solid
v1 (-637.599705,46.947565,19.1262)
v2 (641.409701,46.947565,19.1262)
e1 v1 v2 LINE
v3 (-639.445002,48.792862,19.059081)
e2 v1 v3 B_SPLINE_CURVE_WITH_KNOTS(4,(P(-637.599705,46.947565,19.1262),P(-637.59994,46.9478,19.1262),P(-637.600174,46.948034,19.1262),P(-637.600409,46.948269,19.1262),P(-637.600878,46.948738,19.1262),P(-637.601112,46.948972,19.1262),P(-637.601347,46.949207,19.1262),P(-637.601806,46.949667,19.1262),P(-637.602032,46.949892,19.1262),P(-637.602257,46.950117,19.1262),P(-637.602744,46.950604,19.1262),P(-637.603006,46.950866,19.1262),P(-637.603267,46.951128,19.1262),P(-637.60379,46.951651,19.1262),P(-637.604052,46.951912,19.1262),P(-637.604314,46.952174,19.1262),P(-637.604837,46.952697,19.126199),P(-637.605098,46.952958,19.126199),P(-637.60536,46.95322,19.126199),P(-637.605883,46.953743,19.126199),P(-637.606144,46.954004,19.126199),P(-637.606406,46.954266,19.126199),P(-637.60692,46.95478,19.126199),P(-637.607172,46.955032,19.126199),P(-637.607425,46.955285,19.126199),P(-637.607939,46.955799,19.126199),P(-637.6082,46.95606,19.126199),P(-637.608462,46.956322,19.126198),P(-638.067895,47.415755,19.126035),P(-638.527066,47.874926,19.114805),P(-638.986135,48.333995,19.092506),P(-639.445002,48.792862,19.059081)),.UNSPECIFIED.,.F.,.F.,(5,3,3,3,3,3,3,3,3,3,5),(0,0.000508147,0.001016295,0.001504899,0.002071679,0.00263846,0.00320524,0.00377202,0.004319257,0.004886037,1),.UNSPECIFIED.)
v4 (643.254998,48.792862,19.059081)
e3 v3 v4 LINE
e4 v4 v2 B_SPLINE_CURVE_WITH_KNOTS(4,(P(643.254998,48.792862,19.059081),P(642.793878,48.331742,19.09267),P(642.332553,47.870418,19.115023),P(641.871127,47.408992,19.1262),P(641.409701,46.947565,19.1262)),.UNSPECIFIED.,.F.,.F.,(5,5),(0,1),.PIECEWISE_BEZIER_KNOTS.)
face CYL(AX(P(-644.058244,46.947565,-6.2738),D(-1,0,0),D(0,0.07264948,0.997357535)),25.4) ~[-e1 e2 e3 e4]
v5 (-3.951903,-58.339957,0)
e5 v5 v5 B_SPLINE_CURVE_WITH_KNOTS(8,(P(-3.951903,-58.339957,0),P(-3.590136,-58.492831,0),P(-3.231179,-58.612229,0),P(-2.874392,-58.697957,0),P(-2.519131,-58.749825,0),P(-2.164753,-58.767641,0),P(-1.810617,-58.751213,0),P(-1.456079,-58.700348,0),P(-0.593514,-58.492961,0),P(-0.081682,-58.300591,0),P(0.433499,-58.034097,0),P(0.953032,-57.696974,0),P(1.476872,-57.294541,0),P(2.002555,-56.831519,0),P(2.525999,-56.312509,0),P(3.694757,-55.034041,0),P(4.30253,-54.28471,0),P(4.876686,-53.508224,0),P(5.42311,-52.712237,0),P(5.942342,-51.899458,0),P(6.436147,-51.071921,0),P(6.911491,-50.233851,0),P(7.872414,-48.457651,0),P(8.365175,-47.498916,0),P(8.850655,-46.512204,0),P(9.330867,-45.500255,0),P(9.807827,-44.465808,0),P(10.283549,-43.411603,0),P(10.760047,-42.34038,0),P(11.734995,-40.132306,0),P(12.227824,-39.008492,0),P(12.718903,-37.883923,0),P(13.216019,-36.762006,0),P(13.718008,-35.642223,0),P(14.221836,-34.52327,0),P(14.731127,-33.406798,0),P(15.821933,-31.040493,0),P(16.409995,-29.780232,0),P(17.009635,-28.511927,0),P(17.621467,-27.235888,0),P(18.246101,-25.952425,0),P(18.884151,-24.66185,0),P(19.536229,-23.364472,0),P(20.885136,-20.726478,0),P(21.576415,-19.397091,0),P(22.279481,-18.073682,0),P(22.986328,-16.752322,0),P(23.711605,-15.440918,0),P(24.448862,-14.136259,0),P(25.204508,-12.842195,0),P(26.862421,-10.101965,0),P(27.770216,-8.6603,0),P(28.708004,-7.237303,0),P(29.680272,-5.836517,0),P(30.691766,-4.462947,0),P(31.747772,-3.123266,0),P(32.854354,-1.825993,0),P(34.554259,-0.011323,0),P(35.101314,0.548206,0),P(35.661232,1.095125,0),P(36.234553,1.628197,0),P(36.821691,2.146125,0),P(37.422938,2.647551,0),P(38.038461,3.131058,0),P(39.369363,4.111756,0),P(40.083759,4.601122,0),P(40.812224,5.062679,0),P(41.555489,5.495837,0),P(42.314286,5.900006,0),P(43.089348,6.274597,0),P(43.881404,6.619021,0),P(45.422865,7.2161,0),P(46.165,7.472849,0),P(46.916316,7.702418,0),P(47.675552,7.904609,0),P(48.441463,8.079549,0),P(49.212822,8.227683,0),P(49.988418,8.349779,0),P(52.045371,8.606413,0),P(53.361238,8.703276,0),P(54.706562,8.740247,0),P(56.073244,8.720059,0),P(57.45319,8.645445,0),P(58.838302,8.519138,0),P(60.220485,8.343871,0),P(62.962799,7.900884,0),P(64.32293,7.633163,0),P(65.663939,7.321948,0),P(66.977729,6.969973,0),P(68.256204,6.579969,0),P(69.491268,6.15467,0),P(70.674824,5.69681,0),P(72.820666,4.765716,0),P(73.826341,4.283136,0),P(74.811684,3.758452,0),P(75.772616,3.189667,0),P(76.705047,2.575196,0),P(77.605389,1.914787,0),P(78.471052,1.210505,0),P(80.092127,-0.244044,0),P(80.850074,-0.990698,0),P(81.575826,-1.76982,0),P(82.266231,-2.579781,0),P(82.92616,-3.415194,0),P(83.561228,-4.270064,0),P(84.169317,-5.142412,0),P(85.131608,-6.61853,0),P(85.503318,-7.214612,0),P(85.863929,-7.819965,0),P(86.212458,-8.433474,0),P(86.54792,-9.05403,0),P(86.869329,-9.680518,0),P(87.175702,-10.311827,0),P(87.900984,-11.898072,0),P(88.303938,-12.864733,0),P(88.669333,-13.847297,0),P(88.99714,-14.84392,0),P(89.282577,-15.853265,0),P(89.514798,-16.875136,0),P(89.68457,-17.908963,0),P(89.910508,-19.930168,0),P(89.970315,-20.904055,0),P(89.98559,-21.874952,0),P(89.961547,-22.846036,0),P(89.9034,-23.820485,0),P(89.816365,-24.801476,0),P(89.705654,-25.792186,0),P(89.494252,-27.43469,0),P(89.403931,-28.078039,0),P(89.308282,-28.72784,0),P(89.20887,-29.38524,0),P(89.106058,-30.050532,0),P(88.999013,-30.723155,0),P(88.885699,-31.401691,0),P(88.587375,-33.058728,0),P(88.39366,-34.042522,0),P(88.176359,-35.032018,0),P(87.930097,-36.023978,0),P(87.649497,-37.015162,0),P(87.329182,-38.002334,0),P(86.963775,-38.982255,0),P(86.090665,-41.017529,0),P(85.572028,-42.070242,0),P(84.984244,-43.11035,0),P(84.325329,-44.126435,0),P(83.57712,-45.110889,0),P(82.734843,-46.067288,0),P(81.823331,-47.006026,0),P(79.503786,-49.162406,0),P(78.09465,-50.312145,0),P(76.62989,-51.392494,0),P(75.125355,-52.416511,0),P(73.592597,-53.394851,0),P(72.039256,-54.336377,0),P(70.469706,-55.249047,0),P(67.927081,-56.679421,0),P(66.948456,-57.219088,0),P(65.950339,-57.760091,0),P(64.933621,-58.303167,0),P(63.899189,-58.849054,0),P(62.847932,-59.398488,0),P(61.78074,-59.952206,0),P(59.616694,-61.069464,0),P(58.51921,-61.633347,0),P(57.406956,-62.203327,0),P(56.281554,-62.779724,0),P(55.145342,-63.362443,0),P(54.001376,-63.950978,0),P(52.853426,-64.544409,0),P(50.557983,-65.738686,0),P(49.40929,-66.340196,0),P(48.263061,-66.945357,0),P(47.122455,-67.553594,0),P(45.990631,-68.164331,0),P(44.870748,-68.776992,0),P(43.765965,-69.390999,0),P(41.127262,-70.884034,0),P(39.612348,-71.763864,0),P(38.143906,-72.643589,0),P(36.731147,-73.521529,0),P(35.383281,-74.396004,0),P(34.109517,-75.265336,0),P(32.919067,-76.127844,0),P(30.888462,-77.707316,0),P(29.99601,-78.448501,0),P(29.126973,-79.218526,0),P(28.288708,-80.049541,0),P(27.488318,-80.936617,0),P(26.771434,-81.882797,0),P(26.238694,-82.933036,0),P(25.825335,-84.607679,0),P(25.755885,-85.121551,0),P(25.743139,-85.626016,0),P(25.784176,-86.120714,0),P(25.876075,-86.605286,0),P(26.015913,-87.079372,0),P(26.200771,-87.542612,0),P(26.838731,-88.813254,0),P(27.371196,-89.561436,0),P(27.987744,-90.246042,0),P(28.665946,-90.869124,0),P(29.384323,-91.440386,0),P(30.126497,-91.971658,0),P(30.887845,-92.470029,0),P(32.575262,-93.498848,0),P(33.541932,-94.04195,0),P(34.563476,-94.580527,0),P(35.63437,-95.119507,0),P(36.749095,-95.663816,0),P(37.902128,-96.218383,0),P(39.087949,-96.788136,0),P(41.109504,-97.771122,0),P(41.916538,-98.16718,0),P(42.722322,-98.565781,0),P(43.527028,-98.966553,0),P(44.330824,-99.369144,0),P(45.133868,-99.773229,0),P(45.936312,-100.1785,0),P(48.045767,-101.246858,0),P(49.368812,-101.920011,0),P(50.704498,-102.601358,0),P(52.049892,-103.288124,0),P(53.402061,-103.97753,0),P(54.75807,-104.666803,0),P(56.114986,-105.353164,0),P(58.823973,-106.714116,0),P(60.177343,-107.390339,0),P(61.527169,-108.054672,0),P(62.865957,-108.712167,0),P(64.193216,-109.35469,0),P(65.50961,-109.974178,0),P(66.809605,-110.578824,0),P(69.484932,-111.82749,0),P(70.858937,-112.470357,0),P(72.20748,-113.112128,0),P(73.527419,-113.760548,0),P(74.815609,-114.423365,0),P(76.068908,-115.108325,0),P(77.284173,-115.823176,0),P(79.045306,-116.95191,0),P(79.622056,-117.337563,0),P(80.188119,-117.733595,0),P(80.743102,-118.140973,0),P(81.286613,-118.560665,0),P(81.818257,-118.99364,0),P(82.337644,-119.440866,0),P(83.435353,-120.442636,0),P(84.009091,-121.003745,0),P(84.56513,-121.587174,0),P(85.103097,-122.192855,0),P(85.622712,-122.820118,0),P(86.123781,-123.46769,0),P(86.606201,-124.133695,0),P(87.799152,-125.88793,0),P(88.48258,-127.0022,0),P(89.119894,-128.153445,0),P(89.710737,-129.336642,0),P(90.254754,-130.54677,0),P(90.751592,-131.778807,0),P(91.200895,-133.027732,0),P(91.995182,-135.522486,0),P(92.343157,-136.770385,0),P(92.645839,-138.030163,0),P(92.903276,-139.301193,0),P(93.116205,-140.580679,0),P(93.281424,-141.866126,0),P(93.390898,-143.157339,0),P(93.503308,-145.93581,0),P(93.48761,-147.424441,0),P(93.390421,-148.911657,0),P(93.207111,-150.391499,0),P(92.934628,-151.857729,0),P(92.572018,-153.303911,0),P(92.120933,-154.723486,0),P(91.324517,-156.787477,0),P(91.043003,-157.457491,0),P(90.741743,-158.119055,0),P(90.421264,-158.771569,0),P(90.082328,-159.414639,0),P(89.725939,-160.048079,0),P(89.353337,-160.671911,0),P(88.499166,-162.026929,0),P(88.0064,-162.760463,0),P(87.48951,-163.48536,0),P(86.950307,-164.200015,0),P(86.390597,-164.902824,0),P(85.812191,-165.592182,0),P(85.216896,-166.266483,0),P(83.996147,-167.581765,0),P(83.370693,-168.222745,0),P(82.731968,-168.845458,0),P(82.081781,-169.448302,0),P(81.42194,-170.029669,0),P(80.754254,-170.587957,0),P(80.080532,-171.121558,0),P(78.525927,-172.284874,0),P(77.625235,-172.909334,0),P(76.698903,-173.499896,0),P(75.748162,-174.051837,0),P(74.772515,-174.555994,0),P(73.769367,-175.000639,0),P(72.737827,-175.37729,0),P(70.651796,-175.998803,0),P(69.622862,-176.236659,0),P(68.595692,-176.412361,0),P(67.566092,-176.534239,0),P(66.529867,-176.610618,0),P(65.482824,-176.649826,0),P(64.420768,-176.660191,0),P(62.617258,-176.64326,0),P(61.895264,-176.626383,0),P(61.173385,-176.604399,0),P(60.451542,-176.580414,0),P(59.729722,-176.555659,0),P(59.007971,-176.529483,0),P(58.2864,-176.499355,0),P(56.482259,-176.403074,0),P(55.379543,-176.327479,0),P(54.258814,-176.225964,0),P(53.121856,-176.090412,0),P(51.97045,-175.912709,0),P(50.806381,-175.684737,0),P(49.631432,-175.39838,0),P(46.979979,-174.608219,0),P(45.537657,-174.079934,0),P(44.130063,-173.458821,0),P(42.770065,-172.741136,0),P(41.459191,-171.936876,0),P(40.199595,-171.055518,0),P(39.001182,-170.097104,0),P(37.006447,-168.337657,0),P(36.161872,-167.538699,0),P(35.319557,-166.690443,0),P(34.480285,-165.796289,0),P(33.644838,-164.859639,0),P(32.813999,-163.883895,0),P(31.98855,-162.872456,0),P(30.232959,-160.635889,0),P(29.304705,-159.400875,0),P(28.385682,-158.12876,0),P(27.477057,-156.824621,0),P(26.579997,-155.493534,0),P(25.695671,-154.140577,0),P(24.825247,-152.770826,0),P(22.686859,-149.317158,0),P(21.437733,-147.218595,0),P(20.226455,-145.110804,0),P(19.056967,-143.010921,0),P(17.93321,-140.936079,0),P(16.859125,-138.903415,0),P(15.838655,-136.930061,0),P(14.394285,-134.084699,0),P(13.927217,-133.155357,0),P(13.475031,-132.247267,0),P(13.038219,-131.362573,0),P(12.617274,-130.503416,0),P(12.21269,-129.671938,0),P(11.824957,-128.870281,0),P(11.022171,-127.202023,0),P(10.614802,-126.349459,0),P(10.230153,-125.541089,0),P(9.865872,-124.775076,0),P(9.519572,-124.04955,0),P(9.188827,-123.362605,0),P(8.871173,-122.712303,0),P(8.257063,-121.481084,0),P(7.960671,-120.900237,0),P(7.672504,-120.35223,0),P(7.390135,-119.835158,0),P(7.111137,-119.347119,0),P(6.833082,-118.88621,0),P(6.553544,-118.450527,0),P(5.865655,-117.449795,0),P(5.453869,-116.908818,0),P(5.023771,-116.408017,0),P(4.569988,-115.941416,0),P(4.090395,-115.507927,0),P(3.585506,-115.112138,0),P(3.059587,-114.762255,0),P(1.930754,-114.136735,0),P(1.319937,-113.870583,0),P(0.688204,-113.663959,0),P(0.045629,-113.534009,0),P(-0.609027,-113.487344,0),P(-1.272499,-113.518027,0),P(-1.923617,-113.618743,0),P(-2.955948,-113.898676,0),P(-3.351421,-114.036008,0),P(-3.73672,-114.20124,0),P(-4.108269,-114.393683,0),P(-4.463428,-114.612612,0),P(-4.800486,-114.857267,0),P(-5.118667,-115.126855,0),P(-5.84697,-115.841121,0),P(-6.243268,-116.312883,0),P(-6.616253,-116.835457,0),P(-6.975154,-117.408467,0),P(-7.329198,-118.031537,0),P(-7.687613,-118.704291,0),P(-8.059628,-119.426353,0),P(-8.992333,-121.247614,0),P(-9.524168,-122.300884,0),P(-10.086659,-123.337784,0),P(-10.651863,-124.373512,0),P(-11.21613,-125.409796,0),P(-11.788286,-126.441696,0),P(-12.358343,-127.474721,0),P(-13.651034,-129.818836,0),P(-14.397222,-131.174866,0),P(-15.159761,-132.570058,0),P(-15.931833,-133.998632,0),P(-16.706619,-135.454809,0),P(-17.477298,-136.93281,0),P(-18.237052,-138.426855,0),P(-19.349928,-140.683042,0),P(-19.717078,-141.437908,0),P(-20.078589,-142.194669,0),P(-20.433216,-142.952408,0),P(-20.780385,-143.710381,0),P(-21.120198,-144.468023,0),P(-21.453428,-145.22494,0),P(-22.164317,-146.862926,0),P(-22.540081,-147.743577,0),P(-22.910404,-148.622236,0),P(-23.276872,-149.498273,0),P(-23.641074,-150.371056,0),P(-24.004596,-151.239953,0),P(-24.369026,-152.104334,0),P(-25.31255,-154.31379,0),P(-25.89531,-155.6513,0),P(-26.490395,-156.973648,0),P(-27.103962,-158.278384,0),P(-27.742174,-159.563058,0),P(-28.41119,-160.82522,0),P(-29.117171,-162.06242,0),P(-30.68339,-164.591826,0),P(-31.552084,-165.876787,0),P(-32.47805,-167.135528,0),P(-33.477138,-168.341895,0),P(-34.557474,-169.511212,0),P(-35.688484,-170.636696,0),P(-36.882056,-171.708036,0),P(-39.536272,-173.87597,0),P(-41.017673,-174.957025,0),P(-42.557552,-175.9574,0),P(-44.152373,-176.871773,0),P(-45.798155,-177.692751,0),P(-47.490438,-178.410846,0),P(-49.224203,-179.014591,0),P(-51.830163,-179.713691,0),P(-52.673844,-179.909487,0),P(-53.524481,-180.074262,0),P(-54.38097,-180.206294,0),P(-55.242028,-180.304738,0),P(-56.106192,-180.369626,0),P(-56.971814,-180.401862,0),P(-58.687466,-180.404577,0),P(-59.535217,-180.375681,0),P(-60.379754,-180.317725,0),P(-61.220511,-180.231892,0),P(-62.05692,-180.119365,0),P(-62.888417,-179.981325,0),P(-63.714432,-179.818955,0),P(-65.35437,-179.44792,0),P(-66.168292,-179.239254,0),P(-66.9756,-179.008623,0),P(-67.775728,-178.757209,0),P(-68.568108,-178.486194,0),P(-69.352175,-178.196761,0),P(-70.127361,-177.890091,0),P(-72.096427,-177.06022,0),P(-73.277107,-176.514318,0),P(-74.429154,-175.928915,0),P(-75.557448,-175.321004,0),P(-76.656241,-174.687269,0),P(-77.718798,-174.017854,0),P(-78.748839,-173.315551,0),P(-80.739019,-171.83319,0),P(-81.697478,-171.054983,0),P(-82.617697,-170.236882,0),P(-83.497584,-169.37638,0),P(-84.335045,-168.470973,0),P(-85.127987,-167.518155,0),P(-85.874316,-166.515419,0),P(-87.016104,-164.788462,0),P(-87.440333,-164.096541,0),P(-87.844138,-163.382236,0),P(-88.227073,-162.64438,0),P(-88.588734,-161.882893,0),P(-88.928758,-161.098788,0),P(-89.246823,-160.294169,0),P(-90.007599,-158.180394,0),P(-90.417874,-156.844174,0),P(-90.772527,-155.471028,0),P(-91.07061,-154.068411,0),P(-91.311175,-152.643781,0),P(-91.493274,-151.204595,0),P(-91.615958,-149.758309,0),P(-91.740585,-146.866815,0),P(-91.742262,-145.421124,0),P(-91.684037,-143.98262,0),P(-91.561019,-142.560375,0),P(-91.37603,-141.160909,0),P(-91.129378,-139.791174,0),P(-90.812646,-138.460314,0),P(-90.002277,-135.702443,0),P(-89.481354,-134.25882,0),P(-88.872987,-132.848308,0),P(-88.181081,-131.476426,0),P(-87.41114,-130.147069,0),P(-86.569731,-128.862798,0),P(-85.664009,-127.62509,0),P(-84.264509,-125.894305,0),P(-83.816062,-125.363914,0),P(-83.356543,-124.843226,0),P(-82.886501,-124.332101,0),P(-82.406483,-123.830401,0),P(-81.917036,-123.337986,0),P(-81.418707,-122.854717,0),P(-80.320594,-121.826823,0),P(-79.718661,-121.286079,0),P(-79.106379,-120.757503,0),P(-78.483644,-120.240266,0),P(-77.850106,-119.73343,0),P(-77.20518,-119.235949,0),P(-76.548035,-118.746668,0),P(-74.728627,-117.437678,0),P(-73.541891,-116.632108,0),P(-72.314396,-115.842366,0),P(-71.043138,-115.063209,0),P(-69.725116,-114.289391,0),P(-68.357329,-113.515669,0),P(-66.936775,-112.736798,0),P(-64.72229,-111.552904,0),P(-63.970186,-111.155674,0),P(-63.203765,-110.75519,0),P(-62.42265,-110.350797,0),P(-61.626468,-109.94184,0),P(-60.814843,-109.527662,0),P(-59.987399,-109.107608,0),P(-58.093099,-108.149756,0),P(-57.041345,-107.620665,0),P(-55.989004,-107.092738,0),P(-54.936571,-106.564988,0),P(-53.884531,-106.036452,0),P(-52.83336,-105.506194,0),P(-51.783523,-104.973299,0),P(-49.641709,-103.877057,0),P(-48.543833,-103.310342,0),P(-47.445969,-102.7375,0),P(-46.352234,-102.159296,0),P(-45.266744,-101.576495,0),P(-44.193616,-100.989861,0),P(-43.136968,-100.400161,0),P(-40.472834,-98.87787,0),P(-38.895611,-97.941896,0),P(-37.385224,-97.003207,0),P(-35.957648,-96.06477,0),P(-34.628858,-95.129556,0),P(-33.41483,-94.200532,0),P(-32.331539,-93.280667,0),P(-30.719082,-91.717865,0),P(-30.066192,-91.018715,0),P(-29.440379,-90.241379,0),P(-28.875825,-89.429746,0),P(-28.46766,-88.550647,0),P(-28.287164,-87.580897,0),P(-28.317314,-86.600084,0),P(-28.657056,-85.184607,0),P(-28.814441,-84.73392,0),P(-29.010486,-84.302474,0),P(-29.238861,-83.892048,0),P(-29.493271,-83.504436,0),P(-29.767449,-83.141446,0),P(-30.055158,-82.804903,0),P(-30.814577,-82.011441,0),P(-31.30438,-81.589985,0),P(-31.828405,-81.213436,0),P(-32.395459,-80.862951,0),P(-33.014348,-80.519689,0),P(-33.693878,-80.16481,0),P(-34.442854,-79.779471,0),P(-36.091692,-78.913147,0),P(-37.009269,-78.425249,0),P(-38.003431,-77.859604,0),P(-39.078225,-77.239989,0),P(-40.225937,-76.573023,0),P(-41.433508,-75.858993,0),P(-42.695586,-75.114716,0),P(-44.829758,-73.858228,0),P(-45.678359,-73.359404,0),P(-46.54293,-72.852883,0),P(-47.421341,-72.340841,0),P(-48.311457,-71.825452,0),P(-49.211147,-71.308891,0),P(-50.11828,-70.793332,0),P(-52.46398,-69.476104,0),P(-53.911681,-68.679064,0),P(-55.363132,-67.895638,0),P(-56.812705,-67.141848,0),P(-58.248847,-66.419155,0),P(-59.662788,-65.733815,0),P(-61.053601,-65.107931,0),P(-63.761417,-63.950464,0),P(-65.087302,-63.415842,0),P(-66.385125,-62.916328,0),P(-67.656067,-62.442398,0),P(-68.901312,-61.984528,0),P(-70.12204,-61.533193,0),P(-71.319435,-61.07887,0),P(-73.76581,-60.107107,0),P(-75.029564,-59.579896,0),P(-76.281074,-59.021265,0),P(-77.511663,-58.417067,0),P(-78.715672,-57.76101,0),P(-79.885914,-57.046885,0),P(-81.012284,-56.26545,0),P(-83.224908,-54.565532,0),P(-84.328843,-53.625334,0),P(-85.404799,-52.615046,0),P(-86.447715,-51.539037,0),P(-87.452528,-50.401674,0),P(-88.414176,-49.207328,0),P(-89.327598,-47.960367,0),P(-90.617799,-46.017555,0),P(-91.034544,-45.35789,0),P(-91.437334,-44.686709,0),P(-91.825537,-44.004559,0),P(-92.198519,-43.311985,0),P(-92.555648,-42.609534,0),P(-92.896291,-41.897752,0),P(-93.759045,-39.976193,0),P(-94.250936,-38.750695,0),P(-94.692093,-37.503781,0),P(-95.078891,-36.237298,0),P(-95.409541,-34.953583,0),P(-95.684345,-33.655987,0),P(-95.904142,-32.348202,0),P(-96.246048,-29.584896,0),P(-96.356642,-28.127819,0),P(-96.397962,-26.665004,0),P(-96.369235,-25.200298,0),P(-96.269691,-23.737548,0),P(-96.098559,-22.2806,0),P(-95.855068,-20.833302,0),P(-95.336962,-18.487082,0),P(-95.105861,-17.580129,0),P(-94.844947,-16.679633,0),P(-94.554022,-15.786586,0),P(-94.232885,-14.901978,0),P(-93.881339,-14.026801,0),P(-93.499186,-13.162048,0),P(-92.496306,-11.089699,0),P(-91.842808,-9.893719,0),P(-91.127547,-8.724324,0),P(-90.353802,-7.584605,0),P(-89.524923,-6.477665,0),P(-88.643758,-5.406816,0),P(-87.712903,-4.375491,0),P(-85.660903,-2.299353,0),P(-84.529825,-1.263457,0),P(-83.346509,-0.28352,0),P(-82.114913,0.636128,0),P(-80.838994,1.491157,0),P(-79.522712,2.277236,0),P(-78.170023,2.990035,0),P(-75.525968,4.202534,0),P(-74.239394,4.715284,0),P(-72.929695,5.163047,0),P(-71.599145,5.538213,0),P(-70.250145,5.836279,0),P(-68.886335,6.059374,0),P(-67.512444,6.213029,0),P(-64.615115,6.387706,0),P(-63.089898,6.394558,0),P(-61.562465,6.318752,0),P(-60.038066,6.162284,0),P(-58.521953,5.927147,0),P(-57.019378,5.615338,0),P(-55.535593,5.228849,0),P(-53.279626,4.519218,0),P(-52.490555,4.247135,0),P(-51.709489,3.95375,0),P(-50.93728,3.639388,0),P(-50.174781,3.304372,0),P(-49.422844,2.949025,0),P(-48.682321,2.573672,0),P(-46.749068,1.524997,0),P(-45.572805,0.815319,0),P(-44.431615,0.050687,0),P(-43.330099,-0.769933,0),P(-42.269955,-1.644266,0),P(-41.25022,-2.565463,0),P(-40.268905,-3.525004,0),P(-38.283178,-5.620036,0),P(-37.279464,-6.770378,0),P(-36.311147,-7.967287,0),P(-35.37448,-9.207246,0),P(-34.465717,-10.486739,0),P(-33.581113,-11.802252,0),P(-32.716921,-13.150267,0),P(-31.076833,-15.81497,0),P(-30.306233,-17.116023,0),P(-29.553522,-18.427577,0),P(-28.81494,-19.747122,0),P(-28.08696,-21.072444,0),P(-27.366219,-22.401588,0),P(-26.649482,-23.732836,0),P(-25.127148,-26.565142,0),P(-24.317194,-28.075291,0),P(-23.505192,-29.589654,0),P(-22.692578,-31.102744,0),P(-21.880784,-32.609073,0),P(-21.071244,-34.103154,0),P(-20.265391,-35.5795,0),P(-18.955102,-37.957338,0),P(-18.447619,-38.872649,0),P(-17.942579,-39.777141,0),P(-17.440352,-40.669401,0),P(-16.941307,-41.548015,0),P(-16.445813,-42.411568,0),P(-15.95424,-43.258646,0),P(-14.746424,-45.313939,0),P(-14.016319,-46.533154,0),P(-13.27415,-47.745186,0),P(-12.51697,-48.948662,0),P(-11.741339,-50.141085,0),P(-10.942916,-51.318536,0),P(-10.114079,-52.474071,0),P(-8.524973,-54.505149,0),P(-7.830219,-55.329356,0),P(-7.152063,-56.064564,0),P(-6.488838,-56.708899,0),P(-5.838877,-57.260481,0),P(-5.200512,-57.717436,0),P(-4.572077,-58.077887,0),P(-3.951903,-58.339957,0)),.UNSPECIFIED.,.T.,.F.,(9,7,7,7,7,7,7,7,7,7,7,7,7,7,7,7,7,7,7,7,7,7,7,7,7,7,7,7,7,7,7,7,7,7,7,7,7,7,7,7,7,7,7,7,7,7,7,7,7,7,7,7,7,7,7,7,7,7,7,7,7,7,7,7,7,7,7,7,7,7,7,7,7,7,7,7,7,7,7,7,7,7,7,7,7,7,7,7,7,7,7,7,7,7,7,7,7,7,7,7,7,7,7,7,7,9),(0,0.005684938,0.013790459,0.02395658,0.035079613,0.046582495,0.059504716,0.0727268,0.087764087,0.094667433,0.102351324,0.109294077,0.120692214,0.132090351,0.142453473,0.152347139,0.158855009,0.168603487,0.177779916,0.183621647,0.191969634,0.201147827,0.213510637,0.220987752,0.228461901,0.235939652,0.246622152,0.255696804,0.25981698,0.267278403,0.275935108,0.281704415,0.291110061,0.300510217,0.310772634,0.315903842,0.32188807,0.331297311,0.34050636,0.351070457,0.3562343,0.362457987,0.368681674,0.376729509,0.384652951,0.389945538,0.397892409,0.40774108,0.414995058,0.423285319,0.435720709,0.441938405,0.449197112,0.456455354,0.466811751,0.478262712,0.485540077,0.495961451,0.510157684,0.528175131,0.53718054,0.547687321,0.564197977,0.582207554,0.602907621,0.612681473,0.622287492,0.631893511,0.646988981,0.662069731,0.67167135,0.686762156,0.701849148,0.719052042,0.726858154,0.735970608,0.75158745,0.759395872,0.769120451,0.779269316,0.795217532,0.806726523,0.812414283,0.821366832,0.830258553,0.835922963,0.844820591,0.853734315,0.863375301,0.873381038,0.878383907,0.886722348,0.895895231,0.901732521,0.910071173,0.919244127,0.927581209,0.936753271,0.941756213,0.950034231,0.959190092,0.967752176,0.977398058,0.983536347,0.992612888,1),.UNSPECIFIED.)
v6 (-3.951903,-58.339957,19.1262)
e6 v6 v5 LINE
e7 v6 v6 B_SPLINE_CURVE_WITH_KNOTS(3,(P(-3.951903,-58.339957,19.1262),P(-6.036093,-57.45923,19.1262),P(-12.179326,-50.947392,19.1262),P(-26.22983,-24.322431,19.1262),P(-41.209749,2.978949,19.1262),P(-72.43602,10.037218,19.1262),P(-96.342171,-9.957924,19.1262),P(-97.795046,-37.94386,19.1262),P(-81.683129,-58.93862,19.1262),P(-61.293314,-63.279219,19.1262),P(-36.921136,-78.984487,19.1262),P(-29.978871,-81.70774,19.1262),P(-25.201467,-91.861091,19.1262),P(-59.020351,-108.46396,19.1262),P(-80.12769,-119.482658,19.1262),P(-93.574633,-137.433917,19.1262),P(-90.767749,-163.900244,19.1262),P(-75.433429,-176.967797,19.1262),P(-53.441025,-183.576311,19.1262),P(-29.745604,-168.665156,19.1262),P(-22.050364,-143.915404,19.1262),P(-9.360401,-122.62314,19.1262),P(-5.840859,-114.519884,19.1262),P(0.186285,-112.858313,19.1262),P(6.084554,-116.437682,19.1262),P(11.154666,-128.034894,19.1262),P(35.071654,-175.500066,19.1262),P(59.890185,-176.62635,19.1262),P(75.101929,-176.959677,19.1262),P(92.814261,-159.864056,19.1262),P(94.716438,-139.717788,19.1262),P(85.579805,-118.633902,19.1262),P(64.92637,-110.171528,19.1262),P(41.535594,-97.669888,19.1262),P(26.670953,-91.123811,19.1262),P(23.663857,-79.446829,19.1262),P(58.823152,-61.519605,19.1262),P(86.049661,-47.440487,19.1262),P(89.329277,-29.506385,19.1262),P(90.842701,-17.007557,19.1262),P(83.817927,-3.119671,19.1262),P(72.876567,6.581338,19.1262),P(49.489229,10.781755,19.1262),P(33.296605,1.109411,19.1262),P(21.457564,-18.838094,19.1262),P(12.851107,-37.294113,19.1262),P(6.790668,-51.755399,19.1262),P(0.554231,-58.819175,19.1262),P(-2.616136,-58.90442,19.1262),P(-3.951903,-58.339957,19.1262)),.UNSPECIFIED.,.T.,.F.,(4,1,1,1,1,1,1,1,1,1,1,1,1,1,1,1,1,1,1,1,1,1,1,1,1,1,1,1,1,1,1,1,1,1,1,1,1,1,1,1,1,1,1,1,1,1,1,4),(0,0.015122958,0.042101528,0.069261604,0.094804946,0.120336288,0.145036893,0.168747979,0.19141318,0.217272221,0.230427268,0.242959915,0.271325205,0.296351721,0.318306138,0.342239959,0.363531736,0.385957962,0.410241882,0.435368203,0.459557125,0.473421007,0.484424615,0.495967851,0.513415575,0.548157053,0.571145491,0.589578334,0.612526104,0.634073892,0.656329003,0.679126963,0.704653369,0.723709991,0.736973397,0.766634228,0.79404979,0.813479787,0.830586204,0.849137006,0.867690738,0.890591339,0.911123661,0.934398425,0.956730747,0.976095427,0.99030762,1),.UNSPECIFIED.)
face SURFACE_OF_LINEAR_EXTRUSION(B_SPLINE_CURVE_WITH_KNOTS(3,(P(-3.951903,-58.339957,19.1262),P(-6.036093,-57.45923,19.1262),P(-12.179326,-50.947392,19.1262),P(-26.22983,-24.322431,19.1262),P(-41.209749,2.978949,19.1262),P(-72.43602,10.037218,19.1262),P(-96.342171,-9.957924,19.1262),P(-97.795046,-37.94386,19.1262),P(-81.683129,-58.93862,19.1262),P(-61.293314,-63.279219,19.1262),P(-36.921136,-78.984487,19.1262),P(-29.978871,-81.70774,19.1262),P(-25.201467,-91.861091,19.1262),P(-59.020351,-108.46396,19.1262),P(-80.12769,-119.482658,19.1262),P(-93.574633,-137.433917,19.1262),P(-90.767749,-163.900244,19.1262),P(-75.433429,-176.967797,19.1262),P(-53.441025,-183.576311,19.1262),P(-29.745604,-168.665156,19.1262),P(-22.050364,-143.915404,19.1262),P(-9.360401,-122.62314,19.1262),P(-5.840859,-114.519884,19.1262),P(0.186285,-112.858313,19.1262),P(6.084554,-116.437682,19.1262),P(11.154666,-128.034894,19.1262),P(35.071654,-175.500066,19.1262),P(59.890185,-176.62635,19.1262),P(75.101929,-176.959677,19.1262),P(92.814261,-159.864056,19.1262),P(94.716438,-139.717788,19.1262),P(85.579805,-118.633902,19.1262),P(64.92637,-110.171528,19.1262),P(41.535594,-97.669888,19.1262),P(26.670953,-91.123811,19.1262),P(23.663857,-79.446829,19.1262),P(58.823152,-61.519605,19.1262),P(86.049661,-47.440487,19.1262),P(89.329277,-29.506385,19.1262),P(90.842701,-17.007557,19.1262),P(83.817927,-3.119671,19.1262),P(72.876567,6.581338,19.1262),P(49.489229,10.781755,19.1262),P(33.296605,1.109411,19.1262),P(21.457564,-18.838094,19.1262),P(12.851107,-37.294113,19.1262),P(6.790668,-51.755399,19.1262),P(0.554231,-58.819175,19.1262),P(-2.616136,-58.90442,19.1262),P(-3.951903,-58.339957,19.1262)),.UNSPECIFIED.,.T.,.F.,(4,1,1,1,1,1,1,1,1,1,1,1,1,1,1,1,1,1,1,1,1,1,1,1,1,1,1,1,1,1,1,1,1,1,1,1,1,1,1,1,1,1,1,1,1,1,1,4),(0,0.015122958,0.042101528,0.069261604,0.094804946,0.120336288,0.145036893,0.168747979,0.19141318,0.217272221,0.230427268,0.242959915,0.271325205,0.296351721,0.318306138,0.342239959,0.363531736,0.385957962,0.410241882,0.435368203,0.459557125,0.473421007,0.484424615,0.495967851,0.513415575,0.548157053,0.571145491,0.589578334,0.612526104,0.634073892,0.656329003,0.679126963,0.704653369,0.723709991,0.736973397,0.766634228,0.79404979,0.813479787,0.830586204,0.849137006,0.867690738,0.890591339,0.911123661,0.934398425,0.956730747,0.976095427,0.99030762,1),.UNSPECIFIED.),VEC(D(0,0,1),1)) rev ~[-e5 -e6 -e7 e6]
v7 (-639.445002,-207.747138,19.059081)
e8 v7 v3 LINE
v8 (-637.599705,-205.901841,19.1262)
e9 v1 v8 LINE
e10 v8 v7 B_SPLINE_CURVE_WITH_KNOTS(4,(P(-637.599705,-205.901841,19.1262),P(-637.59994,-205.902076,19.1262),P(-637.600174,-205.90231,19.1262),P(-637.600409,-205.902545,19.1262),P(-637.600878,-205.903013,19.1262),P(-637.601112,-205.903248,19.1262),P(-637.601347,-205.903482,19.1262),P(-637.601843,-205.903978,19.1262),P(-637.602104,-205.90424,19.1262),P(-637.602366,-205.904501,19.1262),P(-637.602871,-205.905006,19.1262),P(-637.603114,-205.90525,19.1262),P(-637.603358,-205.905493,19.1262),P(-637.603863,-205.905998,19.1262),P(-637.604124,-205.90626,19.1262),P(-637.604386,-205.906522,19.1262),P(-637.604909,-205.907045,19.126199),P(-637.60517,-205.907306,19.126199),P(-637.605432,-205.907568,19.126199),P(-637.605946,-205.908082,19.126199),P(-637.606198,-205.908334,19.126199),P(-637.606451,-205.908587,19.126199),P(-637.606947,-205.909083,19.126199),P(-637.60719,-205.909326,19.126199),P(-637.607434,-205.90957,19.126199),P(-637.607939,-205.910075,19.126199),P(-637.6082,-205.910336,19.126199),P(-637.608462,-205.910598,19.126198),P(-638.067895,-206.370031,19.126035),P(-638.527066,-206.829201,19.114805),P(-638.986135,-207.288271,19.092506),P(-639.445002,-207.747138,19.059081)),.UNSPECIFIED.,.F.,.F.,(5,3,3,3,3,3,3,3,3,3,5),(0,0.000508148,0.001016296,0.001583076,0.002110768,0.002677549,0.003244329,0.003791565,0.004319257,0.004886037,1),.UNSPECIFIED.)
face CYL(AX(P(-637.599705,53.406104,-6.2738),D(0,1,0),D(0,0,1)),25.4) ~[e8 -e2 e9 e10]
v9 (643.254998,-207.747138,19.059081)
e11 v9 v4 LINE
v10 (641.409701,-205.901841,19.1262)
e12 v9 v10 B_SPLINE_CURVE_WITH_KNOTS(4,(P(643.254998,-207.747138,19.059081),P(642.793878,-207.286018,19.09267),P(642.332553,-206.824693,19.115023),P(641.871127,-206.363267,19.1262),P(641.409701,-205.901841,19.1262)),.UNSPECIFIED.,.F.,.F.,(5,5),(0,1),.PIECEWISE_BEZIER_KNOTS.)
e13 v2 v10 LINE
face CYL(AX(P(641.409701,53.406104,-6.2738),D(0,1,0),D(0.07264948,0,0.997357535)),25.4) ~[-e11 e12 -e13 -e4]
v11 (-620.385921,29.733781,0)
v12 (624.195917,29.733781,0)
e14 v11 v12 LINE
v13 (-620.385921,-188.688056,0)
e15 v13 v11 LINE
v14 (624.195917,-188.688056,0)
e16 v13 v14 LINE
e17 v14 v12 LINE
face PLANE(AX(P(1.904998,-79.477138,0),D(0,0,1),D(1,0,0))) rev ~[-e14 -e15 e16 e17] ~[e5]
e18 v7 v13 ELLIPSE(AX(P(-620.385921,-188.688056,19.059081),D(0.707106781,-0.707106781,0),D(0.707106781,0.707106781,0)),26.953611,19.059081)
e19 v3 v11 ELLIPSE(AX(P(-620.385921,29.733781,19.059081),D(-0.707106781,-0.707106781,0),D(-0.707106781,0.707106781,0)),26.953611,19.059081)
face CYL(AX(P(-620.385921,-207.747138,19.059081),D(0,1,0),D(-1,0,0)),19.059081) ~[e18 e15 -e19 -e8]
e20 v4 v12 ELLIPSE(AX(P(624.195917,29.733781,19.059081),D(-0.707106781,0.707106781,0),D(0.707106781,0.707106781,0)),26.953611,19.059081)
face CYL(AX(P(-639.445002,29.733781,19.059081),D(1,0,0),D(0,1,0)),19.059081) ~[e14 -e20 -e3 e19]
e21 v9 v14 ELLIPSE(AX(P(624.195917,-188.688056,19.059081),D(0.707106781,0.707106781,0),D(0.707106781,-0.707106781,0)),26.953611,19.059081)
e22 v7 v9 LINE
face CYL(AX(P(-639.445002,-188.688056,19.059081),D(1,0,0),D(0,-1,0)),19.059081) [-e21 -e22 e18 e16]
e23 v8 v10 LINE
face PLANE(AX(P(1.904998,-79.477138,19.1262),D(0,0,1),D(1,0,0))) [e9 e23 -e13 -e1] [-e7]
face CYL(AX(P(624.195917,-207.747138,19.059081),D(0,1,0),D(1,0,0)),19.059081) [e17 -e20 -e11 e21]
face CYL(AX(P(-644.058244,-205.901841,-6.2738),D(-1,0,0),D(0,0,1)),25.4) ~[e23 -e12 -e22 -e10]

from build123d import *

# Parameters (mm, degrees)
F0_W        = 1282.7
F0_H        = 256.54
F1_DEPTH    = 19.1262
F2_R        = 19.0590813946
F3_T1_DEPTH = 1291.926483958
F3_T3_DEPTH = 265.766483958
F6_DEPTH    = 219.27551


# Not quite as in the source:
# - a fillet or chamfer that OpenCascade refuses, or shapes differently, is made with other operations: its cross-section is extruded or revolved along the edge and cut away or added


with BuildPart() as f1:
    # F0 (on Top) → F1 (new body)
    with BuildSketch(Plane.XY):
        with Locations((1.9049979746, -79.4771378769)):
            Rectangle(F0_W, F0_H)
    extrude(amount=F1_DEPTH)

    # F2
    f2_edges = [f1.edges().sort_by_distance(p)[0] for p in [
        (1.904998, -207.747138, 0),
        (-639.445002, -79.477138, 0),
        (1.904998, 48.792862, 0),
        (643.254998, -79.477138, 0),
    ]]
    fillet(f2_edges, radius=F2_R)

    # F3: fillet of radius 25.4 on 5 edges, made by hand

    # F3_s2 → F3_t1 (cut)
    with BuildSketch(Plane.YZ.offset(-644.0582440044)):
        with BuildLine():
            ThreePointArc((48.7928621231, 19.0590813946), (47.8708238484, 19.1094148025), (46.9475653315, 19.1262))
            Line((46.9475653315, 19.1262), (48.7928621231, 19.1262))
            Line((48.7928621231, 19.1262), (48.7928621231, 19.0590813946))
        make_face()
        with BuildLine():
            ThreePointArc((-205.9018410853, 19.1262), (-206.8250996022, 19.1094148025), (-207.7471378769, 19.0590813946))
            Line((-207.7471378769, 19.0590813946), (-207.7471378769, 19.1262))
            Line((-207.7471378769, 19.1262), (-205.9018410853, 19.1262))
        make_face()
    extrude(amount=F3_T1_DEPTH, mode=Mode.SUBTRACT)

    # F3_s4 → F3_t3 (cut)
    with BuildSketch(Plane.XZ.offset(-53.4061041021)):
        with BuildLine():
            ThreePointArc((-637.5997052338, 19.1262), (-638.5229637507, 19.1094148025), (-639.4450020254, 19.0590813946))
            Line((-639.4450020254, 19.0590813946), (-639.4450020254, 19.1262))
            Line((-639.4450020254, 19.1262), (-637.5997052338, 19.1262))
        make_face()
        with BuildLine():
            ThreePointArc((643.2549979746, 19.0590813946), (642.3329597, 19.1094148025), (641.409701183, 19.1262))
            Line((641.409701183, 19.1262), (643.2549979746, 19.1262))
            Line((643.2549979746, 19.1262), (643.2549979746, 19.0590813946))
        make_face()
    extrude(amount=F3_T3_DEPTH, mode=Mode.SUBTRACT)

    # F5 (on face) → F6 (cut)
    with BuildSketch(Plane.XY.offset(19.1262)):
        with BuildLine():
            add(Edge.make_bspline(
                [(-3.9519034326, -58.3399571478), (-6.0360933822, -57.4592299023), (-12.1793255374, -50.9473924507), (-26.2298304514, -24.3224308517), (-41.2097493794, 2.9789491334), (-72.4360201049, 10.037217761), (-96.3421712705, -9.9579243998), (-97.7950455083, -37.9438595198), (-81.6831294585, -58.938620379), (-61.293313593, -63.2792187165), (-36.9211355632, -78.9844871293), (-29.9788714537, -81.7077400378), (-25.2014666644, -91.8610913919), (-59.0203507366, -108.463960156), (-80.1276897444, -119.4826575733), (-93.5746327257, -137.4339169363), (-90.7677488387, -163.9002438236), (-75.433428627, -176.9677968773), (-53.4410245485, -183.5763107426), (-29.7456035179, -168.6651562344), (-22.0503636386, -143.9154043667), (-9.3604006708, -122.623140043), (-5.8408588762, -114.5198839058), (0.1862852859, -112.8583130861), (6.0845539399, -116.437681633), (11.1546658823, -128.0348941145), (35.0716542184, -175.5000656928), (59.8901853388, -176.6263497926), (75.1019291881, -176.9596767577), (92.8142614948, -159.8640561226), (94.7164382348, -139.7177878097), (85.5798052194, -118.6339024908), (64.9263701876, -110.1715280012), (41.5355938617, -97.6698881148), (26.6709534452, -91.1238108278), (23.6638573364, -79.4468287933), (58.8231521405, -61.5196046341), (86.0496608916, -47.4404865202), (89.3292768817, -29.5063854468), (90.8427014757, -17.0075569753), (83.8179274588, -3.1196709882), (72.876567362, 6.5813384408), (49.4892294606, 10.7817550348), (33.2966053013, 1.1094112138), (21.4575643669, -18.8380942056), (12.8511072657, -37.2941129706), (6.7906675389, -51.7553993461), (0.5542314898, -58.8191746249), (-2.616135601, -58.9044196736), (-3.9519034326, -58.3399571478)],
                knots=[0, 0, 0, 0, 0.0151229584, 0.0421015279, 0.0692616035, 0.0948049462, 0.1203362879, 0.1450368928, 0.1687479785, 0.1914131801, 0.2172722206, 0.2304272682, 0.2429599153, 0.2713252053, 0.2963517214, 0.3183061381, 0.3422399591, 0.3635317357, 0.3859579624, 0.4102418819, 0.4353682028, 0.4595571254, 0.473421007, 0.484424615, 0.4959678507, 0.5134155746, 0.5481570531, 0.5711454908, 0.5895783343, 0.6125261041, 0.634073892, 0.6563290025, 0.6791269627, 0.7046533686, 0.7237099907, 0.7369733968, 0.7666342284, 0.7940497901, 0.8134797873, 0.8305862037, 0.8491370062, 0.8676907375, 0.8905913388, 0.9111236605, 0.9343984251, 0.956730747, 0.9760954269, 0.9903076198, 1, 1, 1, 1], degree=3))
        make_face()
    extrude(amount=-F6_DEPTH, mode=Mode.SUBTRACT)


solid = f1.part
